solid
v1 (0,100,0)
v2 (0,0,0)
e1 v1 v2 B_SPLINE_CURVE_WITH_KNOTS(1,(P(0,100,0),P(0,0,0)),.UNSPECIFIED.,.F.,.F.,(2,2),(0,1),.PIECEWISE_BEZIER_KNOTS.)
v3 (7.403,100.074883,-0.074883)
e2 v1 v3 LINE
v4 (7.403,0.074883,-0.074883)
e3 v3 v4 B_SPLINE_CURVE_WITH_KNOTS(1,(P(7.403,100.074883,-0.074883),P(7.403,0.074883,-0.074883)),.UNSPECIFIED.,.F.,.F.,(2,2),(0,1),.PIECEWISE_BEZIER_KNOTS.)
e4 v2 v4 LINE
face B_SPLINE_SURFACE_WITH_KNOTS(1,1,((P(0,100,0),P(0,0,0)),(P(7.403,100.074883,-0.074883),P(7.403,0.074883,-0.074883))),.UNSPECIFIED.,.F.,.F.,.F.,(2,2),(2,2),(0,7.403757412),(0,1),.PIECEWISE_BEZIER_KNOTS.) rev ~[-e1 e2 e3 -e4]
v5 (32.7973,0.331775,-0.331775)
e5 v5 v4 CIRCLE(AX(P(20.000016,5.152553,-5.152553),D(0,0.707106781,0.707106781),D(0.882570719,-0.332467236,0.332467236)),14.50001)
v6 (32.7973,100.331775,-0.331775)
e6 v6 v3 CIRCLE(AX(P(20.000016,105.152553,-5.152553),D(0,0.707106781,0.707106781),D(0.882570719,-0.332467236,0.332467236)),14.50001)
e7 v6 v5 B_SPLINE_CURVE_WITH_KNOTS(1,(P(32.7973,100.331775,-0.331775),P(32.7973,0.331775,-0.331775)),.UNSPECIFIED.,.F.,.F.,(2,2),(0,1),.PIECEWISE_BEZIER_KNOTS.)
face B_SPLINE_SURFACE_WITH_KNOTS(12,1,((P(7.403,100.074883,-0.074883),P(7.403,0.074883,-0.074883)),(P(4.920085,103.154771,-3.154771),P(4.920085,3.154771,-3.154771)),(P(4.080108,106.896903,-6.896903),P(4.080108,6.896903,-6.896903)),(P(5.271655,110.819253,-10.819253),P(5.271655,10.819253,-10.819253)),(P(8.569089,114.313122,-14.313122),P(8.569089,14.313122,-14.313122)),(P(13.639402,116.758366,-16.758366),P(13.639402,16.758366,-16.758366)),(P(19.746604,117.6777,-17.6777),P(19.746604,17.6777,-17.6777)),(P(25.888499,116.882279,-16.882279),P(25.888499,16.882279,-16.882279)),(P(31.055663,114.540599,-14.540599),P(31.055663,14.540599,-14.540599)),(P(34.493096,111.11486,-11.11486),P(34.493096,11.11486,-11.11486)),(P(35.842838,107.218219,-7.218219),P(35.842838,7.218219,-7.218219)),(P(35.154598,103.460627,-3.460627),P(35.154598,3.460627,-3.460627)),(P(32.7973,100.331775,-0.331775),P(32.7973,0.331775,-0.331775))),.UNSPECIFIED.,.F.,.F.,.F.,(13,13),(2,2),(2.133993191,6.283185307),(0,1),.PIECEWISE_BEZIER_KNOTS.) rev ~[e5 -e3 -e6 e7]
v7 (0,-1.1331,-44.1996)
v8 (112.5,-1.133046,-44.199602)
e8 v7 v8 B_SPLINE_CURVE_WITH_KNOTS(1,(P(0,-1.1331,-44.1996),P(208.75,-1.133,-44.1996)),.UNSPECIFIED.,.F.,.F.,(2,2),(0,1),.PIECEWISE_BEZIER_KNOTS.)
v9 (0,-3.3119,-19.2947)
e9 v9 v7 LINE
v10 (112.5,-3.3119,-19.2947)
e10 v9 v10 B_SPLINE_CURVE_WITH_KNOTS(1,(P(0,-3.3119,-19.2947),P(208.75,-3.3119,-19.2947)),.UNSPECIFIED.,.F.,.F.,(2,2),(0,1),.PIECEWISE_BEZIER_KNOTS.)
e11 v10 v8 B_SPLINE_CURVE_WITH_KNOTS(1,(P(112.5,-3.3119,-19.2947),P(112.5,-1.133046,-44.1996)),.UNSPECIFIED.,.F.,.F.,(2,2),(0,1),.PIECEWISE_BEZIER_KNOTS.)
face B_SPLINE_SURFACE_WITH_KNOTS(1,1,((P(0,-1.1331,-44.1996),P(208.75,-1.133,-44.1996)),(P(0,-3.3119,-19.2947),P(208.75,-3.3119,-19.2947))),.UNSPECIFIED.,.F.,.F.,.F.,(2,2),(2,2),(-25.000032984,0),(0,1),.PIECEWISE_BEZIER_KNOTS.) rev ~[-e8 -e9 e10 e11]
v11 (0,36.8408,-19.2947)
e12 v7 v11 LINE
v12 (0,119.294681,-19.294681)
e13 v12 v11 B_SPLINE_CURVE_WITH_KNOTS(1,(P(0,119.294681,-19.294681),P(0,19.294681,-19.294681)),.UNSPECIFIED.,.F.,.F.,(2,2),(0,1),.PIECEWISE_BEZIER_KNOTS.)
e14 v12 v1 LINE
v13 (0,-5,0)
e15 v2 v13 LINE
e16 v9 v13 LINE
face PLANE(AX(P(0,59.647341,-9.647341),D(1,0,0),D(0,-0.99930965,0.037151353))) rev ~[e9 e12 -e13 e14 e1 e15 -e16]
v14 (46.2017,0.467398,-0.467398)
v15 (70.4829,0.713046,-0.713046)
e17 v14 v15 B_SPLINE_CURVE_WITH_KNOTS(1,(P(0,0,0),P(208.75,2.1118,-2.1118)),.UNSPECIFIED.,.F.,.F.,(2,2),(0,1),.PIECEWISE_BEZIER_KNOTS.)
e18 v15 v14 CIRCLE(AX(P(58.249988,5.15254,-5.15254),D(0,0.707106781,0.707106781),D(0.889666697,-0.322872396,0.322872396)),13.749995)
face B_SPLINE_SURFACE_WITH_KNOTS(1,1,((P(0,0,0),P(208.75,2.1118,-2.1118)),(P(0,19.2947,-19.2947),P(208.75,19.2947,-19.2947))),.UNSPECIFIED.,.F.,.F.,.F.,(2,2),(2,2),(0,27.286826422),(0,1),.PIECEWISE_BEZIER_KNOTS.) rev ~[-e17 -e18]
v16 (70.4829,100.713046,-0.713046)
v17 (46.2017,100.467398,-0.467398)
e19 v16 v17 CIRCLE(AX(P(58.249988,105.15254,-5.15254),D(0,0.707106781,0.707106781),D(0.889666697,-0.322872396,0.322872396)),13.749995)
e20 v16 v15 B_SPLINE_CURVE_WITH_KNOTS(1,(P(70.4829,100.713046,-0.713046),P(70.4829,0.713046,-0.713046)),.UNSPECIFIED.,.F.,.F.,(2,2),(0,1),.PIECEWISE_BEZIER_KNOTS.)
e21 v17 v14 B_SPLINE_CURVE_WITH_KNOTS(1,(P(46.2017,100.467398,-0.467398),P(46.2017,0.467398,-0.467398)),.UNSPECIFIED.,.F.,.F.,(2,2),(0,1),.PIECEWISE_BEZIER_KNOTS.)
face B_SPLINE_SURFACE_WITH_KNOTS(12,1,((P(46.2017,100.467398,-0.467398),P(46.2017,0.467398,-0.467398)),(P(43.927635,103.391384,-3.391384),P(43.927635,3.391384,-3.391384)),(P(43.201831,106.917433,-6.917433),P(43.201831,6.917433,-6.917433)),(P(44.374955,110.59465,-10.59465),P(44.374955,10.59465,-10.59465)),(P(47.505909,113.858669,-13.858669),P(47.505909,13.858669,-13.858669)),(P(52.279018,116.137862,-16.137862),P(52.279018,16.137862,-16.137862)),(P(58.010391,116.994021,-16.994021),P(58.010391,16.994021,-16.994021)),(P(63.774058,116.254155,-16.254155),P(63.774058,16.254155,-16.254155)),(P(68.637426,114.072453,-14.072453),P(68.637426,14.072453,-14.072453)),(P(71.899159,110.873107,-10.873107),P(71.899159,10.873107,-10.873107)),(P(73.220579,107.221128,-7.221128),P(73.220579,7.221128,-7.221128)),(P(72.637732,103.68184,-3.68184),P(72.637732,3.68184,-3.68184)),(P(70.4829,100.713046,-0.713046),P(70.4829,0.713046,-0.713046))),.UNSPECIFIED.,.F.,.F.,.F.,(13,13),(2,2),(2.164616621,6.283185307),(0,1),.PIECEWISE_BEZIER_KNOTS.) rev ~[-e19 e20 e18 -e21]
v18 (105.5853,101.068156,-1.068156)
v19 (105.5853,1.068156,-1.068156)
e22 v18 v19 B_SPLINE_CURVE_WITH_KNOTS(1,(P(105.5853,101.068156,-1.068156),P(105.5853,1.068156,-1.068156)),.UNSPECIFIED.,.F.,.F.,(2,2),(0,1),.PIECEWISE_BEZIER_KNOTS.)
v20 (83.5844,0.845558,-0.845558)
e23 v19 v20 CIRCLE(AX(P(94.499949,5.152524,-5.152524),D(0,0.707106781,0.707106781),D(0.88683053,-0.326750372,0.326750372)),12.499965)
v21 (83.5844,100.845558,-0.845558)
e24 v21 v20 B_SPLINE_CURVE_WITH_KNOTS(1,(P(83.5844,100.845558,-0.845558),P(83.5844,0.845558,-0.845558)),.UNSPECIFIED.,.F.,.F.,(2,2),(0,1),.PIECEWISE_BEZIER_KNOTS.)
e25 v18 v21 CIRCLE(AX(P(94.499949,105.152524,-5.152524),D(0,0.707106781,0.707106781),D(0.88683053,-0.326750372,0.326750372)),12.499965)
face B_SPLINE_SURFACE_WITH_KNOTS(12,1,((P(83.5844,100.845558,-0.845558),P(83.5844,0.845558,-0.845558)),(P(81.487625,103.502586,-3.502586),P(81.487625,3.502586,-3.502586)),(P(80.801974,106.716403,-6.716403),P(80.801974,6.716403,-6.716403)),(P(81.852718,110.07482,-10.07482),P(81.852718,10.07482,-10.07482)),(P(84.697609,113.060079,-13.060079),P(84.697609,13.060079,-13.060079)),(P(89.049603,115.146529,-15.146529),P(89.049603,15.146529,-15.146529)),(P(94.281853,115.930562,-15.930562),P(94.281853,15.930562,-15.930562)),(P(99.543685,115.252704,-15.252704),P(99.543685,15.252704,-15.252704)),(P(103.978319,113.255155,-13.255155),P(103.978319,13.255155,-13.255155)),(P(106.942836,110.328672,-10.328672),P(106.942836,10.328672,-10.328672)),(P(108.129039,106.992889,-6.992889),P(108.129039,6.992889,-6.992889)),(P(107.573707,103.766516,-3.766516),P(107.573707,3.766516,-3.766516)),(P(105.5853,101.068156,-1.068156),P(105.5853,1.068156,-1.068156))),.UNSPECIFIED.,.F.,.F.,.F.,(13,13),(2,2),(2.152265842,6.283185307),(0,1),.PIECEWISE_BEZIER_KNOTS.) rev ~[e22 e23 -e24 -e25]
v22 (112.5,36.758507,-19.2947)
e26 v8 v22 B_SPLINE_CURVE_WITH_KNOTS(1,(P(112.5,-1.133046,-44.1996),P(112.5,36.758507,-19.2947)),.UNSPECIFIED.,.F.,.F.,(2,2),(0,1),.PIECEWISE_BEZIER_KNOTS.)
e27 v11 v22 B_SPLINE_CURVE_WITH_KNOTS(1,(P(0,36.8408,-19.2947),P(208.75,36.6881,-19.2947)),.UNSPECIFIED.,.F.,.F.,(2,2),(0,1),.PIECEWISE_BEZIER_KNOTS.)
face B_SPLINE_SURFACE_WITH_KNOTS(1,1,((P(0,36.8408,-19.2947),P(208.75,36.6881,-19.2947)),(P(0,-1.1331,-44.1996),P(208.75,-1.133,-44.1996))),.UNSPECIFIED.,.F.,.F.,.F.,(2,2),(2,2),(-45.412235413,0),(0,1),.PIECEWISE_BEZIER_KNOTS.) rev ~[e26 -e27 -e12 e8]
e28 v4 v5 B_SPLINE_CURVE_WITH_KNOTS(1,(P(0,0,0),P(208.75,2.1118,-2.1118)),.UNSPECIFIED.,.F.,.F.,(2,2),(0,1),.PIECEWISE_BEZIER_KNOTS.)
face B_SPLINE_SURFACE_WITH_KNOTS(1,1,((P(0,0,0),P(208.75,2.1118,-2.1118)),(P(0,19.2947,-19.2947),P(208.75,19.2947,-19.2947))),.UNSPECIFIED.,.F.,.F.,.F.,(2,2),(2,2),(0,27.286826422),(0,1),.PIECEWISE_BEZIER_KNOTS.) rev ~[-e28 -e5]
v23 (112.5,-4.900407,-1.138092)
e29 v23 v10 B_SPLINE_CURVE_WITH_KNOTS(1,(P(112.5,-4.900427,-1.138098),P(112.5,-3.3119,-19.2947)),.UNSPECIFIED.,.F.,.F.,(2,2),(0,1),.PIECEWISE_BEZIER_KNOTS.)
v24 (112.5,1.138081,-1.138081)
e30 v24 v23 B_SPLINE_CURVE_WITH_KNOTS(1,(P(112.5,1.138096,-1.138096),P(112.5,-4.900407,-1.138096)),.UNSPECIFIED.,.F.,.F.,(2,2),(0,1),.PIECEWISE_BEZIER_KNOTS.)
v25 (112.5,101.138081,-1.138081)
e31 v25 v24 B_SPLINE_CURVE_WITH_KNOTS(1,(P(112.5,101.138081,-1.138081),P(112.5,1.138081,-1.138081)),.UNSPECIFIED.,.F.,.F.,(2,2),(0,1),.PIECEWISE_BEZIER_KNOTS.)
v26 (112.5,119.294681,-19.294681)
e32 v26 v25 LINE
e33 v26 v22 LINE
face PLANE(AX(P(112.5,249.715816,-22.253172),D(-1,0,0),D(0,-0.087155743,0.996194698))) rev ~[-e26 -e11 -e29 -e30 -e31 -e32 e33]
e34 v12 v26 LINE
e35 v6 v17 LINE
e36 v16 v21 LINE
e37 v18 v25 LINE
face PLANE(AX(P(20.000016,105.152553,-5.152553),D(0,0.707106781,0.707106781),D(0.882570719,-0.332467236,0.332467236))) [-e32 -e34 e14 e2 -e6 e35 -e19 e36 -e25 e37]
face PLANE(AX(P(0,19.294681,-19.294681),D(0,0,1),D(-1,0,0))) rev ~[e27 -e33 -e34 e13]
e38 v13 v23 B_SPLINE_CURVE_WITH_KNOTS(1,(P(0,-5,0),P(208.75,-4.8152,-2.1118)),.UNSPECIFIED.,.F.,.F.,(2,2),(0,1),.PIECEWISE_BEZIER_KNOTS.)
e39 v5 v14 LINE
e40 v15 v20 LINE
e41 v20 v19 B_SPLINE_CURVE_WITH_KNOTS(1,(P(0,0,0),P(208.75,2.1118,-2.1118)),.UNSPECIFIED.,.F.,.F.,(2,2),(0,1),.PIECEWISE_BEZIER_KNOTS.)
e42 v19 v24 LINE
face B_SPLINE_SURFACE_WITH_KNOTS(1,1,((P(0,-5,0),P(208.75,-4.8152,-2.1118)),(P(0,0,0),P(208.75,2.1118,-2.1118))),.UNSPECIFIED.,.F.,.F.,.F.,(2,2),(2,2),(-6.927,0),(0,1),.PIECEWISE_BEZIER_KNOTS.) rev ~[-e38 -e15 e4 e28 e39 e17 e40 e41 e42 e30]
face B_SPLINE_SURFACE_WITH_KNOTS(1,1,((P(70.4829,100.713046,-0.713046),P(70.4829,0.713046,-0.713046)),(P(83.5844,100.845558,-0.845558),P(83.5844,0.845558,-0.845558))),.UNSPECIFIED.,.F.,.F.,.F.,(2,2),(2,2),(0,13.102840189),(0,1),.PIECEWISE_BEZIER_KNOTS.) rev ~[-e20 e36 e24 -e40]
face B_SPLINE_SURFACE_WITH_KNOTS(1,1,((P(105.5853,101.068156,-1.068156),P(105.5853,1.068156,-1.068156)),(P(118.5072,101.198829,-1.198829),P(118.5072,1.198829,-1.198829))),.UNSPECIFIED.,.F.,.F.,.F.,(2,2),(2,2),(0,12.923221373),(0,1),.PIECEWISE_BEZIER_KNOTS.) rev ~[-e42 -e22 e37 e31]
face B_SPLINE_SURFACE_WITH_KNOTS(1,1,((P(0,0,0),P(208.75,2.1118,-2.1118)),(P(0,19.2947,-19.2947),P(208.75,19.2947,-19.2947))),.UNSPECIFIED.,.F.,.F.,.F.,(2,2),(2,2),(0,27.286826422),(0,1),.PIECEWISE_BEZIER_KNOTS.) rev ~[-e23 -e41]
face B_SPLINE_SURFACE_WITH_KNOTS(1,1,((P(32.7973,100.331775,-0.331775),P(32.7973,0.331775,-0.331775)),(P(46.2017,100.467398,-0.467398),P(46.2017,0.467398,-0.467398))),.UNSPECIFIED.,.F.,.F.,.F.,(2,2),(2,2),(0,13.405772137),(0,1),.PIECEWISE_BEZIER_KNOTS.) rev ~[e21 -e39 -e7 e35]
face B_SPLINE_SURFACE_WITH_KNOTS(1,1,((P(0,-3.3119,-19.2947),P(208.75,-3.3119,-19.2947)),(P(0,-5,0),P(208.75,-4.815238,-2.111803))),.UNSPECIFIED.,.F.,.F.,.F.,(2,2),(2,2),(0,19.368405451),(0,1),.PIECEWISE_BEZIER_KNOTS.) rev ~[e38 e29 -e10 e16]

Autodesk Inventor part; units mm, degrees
ref_plane "YZ Plane" through (0, 0, 0) normal (1, 0, 0) x (0, 1, 0)
ref_plane "XZ Plane" through (0, 0, 0) normal (0, 1, 0) x (-1, 0, 0)
sketch "Sketch1" plane through (0, 0, 0) normal (0, 0, 1) x (1, 0, 0)
  arc A0 (12.7973, -6.8176) -> (-12.597, -7.1809) centre (0, 0) ccw
  arc A1 (50.4829, -6.2785) -> (26.2017, -6.6259) centre (38.25, 0) ccw
  arc A2 (85.5853, -5.7763) -> (63.5844, -6.091) centre (74.5, 0) ccw
  arc A3 (117.8988, -5.314) -> (98.5072, -5.5914) centre (108.125, 0) ccw
  arc A4 (147.9764, -4.8837) -> (130.6669, -5.1313) centre (139.25, 0) ccw
  arc A5 (177.1345, -4.4665) -> (160.4967, -4.7045) centre (168.75, 0) ccw
  line L0 (-20, 20) -> (188.75, 20)
  line L1 (188.75, 20) -> (188.75, -4.3003)
  line L2 (-20, 20) -> (-20, -7.2868)
  line L3 (-20, -7.2868) -> (188.75, -4.3003)
  dimension "d0" = 29
  dimension "d1" = 27.5
  dimension "d2" = 25
  dimension "d3" = 22.25
  dimension "d4" = 20
  dimension "d5" = 19
  dimension "d6" = 38.25
  dimension "d7" = 36.25
  dimension "d8" = 33.625
  dimension "d9" = 31.125
  dimension "d10" = 29.5
  dimension "d11" = 0
  dimension "d12" = 0
  dimension "d13" = 0
  dimension "d14" = 0
  dimension "d15" = 0
  dimension "d20" = 20
  dimension "d22" = 20
  dimension "d23" = 20
  dimension "d24" = 7
  dimension "d25" = 4.586
sketch "Sketch4" plane through (0, 0, 0) normal (1, 0, 0) x (0, 1, 0)
  line L0 (0, 0) -> (29.9033, -29.9033)
  line L1 (0, 5.9807) -> (0, -35.884) projected
  point P0 (100, 0)
  dimension "d51" = 45
  dimension "d53" = 0
  dimension "d55" = 29.9033
  dimension "d98" = 100
ref_plane "Work Plane4" through (0, 100, 0) normal (0, 0.7071068, 0.7071068) x (1, 0, 0)
ref_plane "Work Plane3" through (-10, 0, 0) normal (0, 0.7071068, 0.7071068) x (1, 0, 0)
sketch "Sketch5" plane through (-10, 0, 0) normal (0, 0.7071068, 0.7071068) x (1, 0, 0)
  arc A0 (42.7973, 0.4692) -> (17.403, 0.1059) centre (30, 7.2868) ccw
  arc A1 (80.4829, 1.0084) -> (56.2017, 0.661) centre (68.25, 7.2868) ccw
  arc A2 (115.5853, 1.5106) -> (93.5844, 1.1958) centre (104.5, 7.2868) ccw
  arc A3 (147.8988, 1.9729) -> (128.5072, 1.6954) centre (138.125, 7.2868) ccw
  arc A4 (177.9764, 2.4032) -> (160.6669, 2.1555) centre (169.25, 7.2868) ccw
  arc A5 (207.1345, 2.8203) -> (190.4967, 2.5823) centre (198.75, 7.2868) ccw
  line L0 (10, 27.2868) -> (218.75, 27.2868)
  line L1 (218.75, 27.2868) -> (218.75, 2.9865)
  line L2 (10, 27.2868) -> (10, 0)
  line L3 (10, 0) -> (17.403, 0.1059)
  line L4 (42.7973, 0.4692) -> (56.2017, 0.661)
  line L5 (80.4829, 1.0084) -> (93.5844, 1.1958)
  line L6 (115.5853, 1.5106) -> (128.5072, 1.6954)
  line L7 (207.1345, 2.8203) -> (218.75, 2.9865)
  line L8 (147.8988, 1.9729) -> (160.6669, 2.1555)
  line L9 (177.9764, 2.4032) -> (190.4967, 2.5823)
  dimension "d56" = 29
  dimension "d57" = 27.5
  dimension "d58" = 25
  dimension "d59" = 22.25
  dimension "d60" = 20
  dimension "d61" = 19
  dimension "d62" = 38.25
  dimension "d63" = 36.25
  dimension "d64" = 33.625
  dimension "d65" = 31.125
  dimension "d66" = 29.5
  dimension "d67" = 0
  dimension "d68" = 0
  dimension "d69" = 0
  dimension "d70" = 0
  dimension "d71" = 0
  dimension "d72" = 20
  dimension "d73" = 20
  dimension "d74" = 20
sketch "Sketch6" plane through (0, 100, 0) normal (0, 0.7071068, 0.7071068) x (1, 0, 0)
  arc A0 (32.7973, 0.4692) -> (7.403, 0.1059) centre (20, 7.2868) ccw
  arc A1 (70.4829, 1.0084) -> (46.2017, 0.661) centre (58.25, 7.2868) ccw
  arc A2 (105.5853, 1.5106) -> (83.5844, 1.1958) centre (94.5, 7.2868) ccw
  arc A3 (137.8988, 1.9729) -> (118.5072, 1.6954) centre (128.125, 7.2868) ccw
  arc A4 (167.9764, 2.4032) -> (150.6669, 2.1555) centre (159.25, 7.2868) ccw
  arc A5 (197.1345, 2.8203) -> (180.4967, 2.5823) centre (188.75, 7.2868) ccw
  line L0 (0, 27.2868) -> (208.75, 27.2868)
  line L1 (208.75, 27.2868) -> (208.75, 2.9865)
  line L2 (0, 27.2868) -> (0, 0)
  line L3 (0, 0) -> (7.403, 0.1059)
  line L4 (32.7973, 0.4692) -> (46.2017, 0.661)
  line L5 (70.4829, 1.0084) -> (83.5844, 1.1958)
  line L6 (105.5853, 1.5106) -> (118.5072, 1.6954)
  line L7 (137.8988, 1.9729) -> (150.6669, 2.1555)
  line L8 (167.9764, 2.4032) -> (180.4967, 2.5823)
  line L9 (197.1345, 2.8203) -> (208.75, 2.9865)
  point P0 (0, -70.7107)
  dimension "d77" = 29
  dimension "d78" = 27.5
  dimension "d79" = 25
  dimension "d80" = 22.25
  dimension "d81" = 20
  dimension "d82" = 19
  dimension "d83" = 38.25
  dimension "d84" = 36.25
  dimension "d85" = 33.625
  dimension "d86" = 31.125
  dimension "d87" = 29.5
  dimension "d88" = 0
  dimension "d89" = 0
  dimension "d90" = 0
  dimension "d91" = 0
  dimension "d92" = 0
  dimension "d93" = 20
  dimension "d94" = 20
  dimension "d95" = 20
loft "Loft1" add profiles "Sketch6", "Sketch5"
sketch "Sketch7" plane through (0, 0, 0) normal (0, 1, 0) x (-1, 0, 0)
  line L0 (0, 0) -> (0, -19.2947) projected
  line L1 (0, -19.2947) -> (-208.75, -19.2947) projected
  line L2 (-208.75, -19.2947) -> (-208.75, -2.1118) projected
  line L3 (-208.75, -2.1118) -> (-197.1345, -1.9943) projected
  ellipse E0 centre (-188.75, -5.1526) end of major axis (-198.25, -5.1526) minor radius 6.7175 (-197.1345, -1.9943) -> (-180.4967, -1.826) ccw projected
  line L4 (-180.4967, -1.826) -> (-167.9764, -1.6993) projected
  ellipse E1 centre (-159.25, -5.1526) end of major axis (-169.25, -5.1526) minor radius 7.0711 (-167.9764, -1.6993) -> (-150.6669, -1.5242) ccw projected
  line L5 (-150.6669, -1.5242) -> (-137.8988, -1.395) projected
  ellipse E2 centre (-128.125, -5.1526) end of major axis (-139.25, -5.1526) minor radius 7.8666 (-137.8988, -1.395) -> (-118.5072, -1.1989) ccw projected
  line L6 (-118.5072, -1.1989) -> (-105.5853, -1.0681) projected
  ellipse E3 centre (-94.5, -5.1526) end of major axis (-107, -5.1526) minor radius 8.8388 (-105.5853, -1.0681) -> (-83.5844, -0.8456) ccw projected
  line L7 (-83.5844, -0.8456) -> (-70.4829, -0.713) projected
  ellipse E4 centre (-58.25, -5.1526) end of major axis (-72, -5.1526) minor radius 9.7227 (-70.4829, -0.713) -> (-46.2017, -0.4674) ccw projected
  line L8 (-46.2017, -0.4674) -> (-32.7973, -0.3318) projected
  ellipse E5 centre (-20, -5.1526) end of major axis (-34.5, -5.1526) minor radius 10.253 (-32.7973, -0.3318) -> (-7.403, -0.0749) ccw projected
  line L9 (-7.403, -0.0749) -> (0, 0) projected
  line L10 (0, 0) -> (0, -19.2947)
  line L11 (0, -19.2947) -> (-208.75, -19.2947)
  line L12 (-208.75, -19.2947) -> (-208.75, -2.1118)
  line L13 (-208.75, -2.1118) -> (0, 0)
sketch "Sketch10" plane through (0, 19.2947, -19.2947) normal (-1, 0, 0) x (0, 0, 1)
  line L0 (19.2947, 80.7053) -> (0, 100) projected
  line L1 (0, 100) -> (0, 0) projected
  line L2 (19.2947, -19.2947) -> (0, 0) projected
  line L3 (19.2947, 80.7053) -> (19.2947, -19.2947) projected
  line L4 (19.2947, -19.2947) -> (19.2947, -24.2947)
  line L5 (0, 0) -> (0, -22.6066)
  line L6 (0, -22.6066) -> (19.2947, -24.2947)
  line L7 (0, -22.6066) -> (-24.9049, -20.4278)
  line L8 (-24.9049, -20.4278) -> (0, 17.5461)
  line L9 (0, 100) -> (0, 0) projected
  line L10 (0, 17.5461) -> (0, 0)
  point P0 (19.2947, -19.2947)
  dimension "d106" = 5
  dimension "d111" = 85
  dimension "d113" = 25
  dimension "d114" = 40
sketch "Sketch11" plane through (208.75, 2.1118, -2.1118) normal (1, 0, 0) x (0, 0, -1)
  line L0 (17.1829, 117.1829) -> (0, 100) projected
  line L1 (0, 100) -> (0, 0) projected
  line L2 (17.1829, 17.1829) -> (0, 0) projected
  line L3 (17.1829, 117.1829) -> (17.1829, 17.1829) projected
  line L4 (17.1829, 17.1829) -> (0, 0)
  line L5 (10.1119, 10.1119) -> (-0.5876, -0.5876) projected
  line L6 (17.1829, -5.4237) -> (-2.1118, -7.1118) projected
  line L7 (0, 0) -> (0, -6.927)
  line L8 (17.1829, -5.4237) -> (0, -6.927)
  line L9 (17.1829, -5.4237) -> (17.1829, 17.1829)
  line L10 (0, -6.927) -> (17.1829, -5.4237)
  line L11 (17.1829, -5.4237) -> (42.0878, -3.2448)
  line L12 (42.0878, -3.2448) -> (17.1829, 34.5763)
  line L13 (17.1829, 117.1829) -> (17.1829, 17.1829) projected
  line L14 (17.1829, 17.1829) -> (17.1829, 34.5763)
  point P0 (-2.1118, -2.1118)
  point P1 (17.1829, -7.1118)
  point P2 (-0.4125, -0.4125)
  dimension "d115" = 25
  dimension "d116" = 40
loft "Loft3" add profiles "Sketch10", "Sketch11" contours L4 L6 L5 L2 | L1 L5 L7 L8 / L12 L11 L9 L3 | L2 L9 L6 L7
sketch "Sketch13" plane through (0, -1.133, -44.1996) normal (0, -0.9961947, -0.0871557) x (1, 0, 0)
  line L0 (0, 35.2171) -> (0, 14.3141) projected
  line L1 (7.403, 35.1359) -> (0, 35.2171) projected
  ellipse E0 centre (20, 29.635) end of major axis (5.5, 29.635) minor radius 11.1076 (7.403, 35.1359) -> (32.7973, 34.8576) ccw projected
  line L2 (46.2017, 34.7107) -> (32.7973, 34.8576) projected
  ellipse E1 centre (58.25, 29.635) end of major axis (44.5, 29.635) minor radius 10.5331 (46.2017, 34.7107) -> (70.4829, 34.4446) ccw projected
  line L3 (83.5844, 34.301) -> (70.4829, 34.4446) projected
  ellipse E2 centre (94.5, 29.635) end of major axis (82, 29.635) minor radius 9.5756 (83.5844, 34.301) -> (105.5853, 34.0599) ccw projected
  line L4 (118.5072, 33.9183) -> (105.5853, 34.0599) projected
  ellipse E3 centre (128.125, 29.635) end of major axis (117, 29.635) minor radius 8.5222 (118.5072, 33.9183) -> (137.8988, 33.7058) ccw projected
  line L5 (150.6669, 33.5658) -> (137.8988, 33.7058) projected
  ellipse E4 centre (159.25, 29.635) end of major axis (149.25, 29.635) minor radius 7.6604 (150.6669, 33.5658) -> (167.9764, 33.3761) ccw projected
  line L6 (180.4967, 33.2389) -> (167.9764, 33.3761) projected
  ellipse E5 centre (188.75, 29.635) end of major axis (179.25, 29.635) minor radius 7.2774 (180.4967, 33.2389) -> (197.1345, 33.0566) ccw projected
  line L7 (208.75, 32.9293) -> (197.1345, 33.0566) projected
  line L8 (208.75, 14.3141) -> (208.75, 32.9293) projected
  line L9 (0, 14.3141) -> (208.75, 14.3141) projected
  line L10 (0, 0) -> (0, 44.3684) projected
  line L11 (0, 0) -> (208.75, 0) projected
  line L12 (208.75, 0) -> (208.75, 42.2486) projected
  line L13 (0, 44.3684) -> (208.75, 42.2486) projected
  line L14 (0, 0) -> (208.75, 0) projected
  line L15 (112.5, 0) -> (112.5, 43.226)
  point P0 (0, 43.9326)
  dimension "d122" = 18
split body "Split1" sketch "Sketch13" result one side removed curves L15 removed pieces at (176.6667, 64.2471, -18.7947)
properties part number "coin_holder_large_only"
